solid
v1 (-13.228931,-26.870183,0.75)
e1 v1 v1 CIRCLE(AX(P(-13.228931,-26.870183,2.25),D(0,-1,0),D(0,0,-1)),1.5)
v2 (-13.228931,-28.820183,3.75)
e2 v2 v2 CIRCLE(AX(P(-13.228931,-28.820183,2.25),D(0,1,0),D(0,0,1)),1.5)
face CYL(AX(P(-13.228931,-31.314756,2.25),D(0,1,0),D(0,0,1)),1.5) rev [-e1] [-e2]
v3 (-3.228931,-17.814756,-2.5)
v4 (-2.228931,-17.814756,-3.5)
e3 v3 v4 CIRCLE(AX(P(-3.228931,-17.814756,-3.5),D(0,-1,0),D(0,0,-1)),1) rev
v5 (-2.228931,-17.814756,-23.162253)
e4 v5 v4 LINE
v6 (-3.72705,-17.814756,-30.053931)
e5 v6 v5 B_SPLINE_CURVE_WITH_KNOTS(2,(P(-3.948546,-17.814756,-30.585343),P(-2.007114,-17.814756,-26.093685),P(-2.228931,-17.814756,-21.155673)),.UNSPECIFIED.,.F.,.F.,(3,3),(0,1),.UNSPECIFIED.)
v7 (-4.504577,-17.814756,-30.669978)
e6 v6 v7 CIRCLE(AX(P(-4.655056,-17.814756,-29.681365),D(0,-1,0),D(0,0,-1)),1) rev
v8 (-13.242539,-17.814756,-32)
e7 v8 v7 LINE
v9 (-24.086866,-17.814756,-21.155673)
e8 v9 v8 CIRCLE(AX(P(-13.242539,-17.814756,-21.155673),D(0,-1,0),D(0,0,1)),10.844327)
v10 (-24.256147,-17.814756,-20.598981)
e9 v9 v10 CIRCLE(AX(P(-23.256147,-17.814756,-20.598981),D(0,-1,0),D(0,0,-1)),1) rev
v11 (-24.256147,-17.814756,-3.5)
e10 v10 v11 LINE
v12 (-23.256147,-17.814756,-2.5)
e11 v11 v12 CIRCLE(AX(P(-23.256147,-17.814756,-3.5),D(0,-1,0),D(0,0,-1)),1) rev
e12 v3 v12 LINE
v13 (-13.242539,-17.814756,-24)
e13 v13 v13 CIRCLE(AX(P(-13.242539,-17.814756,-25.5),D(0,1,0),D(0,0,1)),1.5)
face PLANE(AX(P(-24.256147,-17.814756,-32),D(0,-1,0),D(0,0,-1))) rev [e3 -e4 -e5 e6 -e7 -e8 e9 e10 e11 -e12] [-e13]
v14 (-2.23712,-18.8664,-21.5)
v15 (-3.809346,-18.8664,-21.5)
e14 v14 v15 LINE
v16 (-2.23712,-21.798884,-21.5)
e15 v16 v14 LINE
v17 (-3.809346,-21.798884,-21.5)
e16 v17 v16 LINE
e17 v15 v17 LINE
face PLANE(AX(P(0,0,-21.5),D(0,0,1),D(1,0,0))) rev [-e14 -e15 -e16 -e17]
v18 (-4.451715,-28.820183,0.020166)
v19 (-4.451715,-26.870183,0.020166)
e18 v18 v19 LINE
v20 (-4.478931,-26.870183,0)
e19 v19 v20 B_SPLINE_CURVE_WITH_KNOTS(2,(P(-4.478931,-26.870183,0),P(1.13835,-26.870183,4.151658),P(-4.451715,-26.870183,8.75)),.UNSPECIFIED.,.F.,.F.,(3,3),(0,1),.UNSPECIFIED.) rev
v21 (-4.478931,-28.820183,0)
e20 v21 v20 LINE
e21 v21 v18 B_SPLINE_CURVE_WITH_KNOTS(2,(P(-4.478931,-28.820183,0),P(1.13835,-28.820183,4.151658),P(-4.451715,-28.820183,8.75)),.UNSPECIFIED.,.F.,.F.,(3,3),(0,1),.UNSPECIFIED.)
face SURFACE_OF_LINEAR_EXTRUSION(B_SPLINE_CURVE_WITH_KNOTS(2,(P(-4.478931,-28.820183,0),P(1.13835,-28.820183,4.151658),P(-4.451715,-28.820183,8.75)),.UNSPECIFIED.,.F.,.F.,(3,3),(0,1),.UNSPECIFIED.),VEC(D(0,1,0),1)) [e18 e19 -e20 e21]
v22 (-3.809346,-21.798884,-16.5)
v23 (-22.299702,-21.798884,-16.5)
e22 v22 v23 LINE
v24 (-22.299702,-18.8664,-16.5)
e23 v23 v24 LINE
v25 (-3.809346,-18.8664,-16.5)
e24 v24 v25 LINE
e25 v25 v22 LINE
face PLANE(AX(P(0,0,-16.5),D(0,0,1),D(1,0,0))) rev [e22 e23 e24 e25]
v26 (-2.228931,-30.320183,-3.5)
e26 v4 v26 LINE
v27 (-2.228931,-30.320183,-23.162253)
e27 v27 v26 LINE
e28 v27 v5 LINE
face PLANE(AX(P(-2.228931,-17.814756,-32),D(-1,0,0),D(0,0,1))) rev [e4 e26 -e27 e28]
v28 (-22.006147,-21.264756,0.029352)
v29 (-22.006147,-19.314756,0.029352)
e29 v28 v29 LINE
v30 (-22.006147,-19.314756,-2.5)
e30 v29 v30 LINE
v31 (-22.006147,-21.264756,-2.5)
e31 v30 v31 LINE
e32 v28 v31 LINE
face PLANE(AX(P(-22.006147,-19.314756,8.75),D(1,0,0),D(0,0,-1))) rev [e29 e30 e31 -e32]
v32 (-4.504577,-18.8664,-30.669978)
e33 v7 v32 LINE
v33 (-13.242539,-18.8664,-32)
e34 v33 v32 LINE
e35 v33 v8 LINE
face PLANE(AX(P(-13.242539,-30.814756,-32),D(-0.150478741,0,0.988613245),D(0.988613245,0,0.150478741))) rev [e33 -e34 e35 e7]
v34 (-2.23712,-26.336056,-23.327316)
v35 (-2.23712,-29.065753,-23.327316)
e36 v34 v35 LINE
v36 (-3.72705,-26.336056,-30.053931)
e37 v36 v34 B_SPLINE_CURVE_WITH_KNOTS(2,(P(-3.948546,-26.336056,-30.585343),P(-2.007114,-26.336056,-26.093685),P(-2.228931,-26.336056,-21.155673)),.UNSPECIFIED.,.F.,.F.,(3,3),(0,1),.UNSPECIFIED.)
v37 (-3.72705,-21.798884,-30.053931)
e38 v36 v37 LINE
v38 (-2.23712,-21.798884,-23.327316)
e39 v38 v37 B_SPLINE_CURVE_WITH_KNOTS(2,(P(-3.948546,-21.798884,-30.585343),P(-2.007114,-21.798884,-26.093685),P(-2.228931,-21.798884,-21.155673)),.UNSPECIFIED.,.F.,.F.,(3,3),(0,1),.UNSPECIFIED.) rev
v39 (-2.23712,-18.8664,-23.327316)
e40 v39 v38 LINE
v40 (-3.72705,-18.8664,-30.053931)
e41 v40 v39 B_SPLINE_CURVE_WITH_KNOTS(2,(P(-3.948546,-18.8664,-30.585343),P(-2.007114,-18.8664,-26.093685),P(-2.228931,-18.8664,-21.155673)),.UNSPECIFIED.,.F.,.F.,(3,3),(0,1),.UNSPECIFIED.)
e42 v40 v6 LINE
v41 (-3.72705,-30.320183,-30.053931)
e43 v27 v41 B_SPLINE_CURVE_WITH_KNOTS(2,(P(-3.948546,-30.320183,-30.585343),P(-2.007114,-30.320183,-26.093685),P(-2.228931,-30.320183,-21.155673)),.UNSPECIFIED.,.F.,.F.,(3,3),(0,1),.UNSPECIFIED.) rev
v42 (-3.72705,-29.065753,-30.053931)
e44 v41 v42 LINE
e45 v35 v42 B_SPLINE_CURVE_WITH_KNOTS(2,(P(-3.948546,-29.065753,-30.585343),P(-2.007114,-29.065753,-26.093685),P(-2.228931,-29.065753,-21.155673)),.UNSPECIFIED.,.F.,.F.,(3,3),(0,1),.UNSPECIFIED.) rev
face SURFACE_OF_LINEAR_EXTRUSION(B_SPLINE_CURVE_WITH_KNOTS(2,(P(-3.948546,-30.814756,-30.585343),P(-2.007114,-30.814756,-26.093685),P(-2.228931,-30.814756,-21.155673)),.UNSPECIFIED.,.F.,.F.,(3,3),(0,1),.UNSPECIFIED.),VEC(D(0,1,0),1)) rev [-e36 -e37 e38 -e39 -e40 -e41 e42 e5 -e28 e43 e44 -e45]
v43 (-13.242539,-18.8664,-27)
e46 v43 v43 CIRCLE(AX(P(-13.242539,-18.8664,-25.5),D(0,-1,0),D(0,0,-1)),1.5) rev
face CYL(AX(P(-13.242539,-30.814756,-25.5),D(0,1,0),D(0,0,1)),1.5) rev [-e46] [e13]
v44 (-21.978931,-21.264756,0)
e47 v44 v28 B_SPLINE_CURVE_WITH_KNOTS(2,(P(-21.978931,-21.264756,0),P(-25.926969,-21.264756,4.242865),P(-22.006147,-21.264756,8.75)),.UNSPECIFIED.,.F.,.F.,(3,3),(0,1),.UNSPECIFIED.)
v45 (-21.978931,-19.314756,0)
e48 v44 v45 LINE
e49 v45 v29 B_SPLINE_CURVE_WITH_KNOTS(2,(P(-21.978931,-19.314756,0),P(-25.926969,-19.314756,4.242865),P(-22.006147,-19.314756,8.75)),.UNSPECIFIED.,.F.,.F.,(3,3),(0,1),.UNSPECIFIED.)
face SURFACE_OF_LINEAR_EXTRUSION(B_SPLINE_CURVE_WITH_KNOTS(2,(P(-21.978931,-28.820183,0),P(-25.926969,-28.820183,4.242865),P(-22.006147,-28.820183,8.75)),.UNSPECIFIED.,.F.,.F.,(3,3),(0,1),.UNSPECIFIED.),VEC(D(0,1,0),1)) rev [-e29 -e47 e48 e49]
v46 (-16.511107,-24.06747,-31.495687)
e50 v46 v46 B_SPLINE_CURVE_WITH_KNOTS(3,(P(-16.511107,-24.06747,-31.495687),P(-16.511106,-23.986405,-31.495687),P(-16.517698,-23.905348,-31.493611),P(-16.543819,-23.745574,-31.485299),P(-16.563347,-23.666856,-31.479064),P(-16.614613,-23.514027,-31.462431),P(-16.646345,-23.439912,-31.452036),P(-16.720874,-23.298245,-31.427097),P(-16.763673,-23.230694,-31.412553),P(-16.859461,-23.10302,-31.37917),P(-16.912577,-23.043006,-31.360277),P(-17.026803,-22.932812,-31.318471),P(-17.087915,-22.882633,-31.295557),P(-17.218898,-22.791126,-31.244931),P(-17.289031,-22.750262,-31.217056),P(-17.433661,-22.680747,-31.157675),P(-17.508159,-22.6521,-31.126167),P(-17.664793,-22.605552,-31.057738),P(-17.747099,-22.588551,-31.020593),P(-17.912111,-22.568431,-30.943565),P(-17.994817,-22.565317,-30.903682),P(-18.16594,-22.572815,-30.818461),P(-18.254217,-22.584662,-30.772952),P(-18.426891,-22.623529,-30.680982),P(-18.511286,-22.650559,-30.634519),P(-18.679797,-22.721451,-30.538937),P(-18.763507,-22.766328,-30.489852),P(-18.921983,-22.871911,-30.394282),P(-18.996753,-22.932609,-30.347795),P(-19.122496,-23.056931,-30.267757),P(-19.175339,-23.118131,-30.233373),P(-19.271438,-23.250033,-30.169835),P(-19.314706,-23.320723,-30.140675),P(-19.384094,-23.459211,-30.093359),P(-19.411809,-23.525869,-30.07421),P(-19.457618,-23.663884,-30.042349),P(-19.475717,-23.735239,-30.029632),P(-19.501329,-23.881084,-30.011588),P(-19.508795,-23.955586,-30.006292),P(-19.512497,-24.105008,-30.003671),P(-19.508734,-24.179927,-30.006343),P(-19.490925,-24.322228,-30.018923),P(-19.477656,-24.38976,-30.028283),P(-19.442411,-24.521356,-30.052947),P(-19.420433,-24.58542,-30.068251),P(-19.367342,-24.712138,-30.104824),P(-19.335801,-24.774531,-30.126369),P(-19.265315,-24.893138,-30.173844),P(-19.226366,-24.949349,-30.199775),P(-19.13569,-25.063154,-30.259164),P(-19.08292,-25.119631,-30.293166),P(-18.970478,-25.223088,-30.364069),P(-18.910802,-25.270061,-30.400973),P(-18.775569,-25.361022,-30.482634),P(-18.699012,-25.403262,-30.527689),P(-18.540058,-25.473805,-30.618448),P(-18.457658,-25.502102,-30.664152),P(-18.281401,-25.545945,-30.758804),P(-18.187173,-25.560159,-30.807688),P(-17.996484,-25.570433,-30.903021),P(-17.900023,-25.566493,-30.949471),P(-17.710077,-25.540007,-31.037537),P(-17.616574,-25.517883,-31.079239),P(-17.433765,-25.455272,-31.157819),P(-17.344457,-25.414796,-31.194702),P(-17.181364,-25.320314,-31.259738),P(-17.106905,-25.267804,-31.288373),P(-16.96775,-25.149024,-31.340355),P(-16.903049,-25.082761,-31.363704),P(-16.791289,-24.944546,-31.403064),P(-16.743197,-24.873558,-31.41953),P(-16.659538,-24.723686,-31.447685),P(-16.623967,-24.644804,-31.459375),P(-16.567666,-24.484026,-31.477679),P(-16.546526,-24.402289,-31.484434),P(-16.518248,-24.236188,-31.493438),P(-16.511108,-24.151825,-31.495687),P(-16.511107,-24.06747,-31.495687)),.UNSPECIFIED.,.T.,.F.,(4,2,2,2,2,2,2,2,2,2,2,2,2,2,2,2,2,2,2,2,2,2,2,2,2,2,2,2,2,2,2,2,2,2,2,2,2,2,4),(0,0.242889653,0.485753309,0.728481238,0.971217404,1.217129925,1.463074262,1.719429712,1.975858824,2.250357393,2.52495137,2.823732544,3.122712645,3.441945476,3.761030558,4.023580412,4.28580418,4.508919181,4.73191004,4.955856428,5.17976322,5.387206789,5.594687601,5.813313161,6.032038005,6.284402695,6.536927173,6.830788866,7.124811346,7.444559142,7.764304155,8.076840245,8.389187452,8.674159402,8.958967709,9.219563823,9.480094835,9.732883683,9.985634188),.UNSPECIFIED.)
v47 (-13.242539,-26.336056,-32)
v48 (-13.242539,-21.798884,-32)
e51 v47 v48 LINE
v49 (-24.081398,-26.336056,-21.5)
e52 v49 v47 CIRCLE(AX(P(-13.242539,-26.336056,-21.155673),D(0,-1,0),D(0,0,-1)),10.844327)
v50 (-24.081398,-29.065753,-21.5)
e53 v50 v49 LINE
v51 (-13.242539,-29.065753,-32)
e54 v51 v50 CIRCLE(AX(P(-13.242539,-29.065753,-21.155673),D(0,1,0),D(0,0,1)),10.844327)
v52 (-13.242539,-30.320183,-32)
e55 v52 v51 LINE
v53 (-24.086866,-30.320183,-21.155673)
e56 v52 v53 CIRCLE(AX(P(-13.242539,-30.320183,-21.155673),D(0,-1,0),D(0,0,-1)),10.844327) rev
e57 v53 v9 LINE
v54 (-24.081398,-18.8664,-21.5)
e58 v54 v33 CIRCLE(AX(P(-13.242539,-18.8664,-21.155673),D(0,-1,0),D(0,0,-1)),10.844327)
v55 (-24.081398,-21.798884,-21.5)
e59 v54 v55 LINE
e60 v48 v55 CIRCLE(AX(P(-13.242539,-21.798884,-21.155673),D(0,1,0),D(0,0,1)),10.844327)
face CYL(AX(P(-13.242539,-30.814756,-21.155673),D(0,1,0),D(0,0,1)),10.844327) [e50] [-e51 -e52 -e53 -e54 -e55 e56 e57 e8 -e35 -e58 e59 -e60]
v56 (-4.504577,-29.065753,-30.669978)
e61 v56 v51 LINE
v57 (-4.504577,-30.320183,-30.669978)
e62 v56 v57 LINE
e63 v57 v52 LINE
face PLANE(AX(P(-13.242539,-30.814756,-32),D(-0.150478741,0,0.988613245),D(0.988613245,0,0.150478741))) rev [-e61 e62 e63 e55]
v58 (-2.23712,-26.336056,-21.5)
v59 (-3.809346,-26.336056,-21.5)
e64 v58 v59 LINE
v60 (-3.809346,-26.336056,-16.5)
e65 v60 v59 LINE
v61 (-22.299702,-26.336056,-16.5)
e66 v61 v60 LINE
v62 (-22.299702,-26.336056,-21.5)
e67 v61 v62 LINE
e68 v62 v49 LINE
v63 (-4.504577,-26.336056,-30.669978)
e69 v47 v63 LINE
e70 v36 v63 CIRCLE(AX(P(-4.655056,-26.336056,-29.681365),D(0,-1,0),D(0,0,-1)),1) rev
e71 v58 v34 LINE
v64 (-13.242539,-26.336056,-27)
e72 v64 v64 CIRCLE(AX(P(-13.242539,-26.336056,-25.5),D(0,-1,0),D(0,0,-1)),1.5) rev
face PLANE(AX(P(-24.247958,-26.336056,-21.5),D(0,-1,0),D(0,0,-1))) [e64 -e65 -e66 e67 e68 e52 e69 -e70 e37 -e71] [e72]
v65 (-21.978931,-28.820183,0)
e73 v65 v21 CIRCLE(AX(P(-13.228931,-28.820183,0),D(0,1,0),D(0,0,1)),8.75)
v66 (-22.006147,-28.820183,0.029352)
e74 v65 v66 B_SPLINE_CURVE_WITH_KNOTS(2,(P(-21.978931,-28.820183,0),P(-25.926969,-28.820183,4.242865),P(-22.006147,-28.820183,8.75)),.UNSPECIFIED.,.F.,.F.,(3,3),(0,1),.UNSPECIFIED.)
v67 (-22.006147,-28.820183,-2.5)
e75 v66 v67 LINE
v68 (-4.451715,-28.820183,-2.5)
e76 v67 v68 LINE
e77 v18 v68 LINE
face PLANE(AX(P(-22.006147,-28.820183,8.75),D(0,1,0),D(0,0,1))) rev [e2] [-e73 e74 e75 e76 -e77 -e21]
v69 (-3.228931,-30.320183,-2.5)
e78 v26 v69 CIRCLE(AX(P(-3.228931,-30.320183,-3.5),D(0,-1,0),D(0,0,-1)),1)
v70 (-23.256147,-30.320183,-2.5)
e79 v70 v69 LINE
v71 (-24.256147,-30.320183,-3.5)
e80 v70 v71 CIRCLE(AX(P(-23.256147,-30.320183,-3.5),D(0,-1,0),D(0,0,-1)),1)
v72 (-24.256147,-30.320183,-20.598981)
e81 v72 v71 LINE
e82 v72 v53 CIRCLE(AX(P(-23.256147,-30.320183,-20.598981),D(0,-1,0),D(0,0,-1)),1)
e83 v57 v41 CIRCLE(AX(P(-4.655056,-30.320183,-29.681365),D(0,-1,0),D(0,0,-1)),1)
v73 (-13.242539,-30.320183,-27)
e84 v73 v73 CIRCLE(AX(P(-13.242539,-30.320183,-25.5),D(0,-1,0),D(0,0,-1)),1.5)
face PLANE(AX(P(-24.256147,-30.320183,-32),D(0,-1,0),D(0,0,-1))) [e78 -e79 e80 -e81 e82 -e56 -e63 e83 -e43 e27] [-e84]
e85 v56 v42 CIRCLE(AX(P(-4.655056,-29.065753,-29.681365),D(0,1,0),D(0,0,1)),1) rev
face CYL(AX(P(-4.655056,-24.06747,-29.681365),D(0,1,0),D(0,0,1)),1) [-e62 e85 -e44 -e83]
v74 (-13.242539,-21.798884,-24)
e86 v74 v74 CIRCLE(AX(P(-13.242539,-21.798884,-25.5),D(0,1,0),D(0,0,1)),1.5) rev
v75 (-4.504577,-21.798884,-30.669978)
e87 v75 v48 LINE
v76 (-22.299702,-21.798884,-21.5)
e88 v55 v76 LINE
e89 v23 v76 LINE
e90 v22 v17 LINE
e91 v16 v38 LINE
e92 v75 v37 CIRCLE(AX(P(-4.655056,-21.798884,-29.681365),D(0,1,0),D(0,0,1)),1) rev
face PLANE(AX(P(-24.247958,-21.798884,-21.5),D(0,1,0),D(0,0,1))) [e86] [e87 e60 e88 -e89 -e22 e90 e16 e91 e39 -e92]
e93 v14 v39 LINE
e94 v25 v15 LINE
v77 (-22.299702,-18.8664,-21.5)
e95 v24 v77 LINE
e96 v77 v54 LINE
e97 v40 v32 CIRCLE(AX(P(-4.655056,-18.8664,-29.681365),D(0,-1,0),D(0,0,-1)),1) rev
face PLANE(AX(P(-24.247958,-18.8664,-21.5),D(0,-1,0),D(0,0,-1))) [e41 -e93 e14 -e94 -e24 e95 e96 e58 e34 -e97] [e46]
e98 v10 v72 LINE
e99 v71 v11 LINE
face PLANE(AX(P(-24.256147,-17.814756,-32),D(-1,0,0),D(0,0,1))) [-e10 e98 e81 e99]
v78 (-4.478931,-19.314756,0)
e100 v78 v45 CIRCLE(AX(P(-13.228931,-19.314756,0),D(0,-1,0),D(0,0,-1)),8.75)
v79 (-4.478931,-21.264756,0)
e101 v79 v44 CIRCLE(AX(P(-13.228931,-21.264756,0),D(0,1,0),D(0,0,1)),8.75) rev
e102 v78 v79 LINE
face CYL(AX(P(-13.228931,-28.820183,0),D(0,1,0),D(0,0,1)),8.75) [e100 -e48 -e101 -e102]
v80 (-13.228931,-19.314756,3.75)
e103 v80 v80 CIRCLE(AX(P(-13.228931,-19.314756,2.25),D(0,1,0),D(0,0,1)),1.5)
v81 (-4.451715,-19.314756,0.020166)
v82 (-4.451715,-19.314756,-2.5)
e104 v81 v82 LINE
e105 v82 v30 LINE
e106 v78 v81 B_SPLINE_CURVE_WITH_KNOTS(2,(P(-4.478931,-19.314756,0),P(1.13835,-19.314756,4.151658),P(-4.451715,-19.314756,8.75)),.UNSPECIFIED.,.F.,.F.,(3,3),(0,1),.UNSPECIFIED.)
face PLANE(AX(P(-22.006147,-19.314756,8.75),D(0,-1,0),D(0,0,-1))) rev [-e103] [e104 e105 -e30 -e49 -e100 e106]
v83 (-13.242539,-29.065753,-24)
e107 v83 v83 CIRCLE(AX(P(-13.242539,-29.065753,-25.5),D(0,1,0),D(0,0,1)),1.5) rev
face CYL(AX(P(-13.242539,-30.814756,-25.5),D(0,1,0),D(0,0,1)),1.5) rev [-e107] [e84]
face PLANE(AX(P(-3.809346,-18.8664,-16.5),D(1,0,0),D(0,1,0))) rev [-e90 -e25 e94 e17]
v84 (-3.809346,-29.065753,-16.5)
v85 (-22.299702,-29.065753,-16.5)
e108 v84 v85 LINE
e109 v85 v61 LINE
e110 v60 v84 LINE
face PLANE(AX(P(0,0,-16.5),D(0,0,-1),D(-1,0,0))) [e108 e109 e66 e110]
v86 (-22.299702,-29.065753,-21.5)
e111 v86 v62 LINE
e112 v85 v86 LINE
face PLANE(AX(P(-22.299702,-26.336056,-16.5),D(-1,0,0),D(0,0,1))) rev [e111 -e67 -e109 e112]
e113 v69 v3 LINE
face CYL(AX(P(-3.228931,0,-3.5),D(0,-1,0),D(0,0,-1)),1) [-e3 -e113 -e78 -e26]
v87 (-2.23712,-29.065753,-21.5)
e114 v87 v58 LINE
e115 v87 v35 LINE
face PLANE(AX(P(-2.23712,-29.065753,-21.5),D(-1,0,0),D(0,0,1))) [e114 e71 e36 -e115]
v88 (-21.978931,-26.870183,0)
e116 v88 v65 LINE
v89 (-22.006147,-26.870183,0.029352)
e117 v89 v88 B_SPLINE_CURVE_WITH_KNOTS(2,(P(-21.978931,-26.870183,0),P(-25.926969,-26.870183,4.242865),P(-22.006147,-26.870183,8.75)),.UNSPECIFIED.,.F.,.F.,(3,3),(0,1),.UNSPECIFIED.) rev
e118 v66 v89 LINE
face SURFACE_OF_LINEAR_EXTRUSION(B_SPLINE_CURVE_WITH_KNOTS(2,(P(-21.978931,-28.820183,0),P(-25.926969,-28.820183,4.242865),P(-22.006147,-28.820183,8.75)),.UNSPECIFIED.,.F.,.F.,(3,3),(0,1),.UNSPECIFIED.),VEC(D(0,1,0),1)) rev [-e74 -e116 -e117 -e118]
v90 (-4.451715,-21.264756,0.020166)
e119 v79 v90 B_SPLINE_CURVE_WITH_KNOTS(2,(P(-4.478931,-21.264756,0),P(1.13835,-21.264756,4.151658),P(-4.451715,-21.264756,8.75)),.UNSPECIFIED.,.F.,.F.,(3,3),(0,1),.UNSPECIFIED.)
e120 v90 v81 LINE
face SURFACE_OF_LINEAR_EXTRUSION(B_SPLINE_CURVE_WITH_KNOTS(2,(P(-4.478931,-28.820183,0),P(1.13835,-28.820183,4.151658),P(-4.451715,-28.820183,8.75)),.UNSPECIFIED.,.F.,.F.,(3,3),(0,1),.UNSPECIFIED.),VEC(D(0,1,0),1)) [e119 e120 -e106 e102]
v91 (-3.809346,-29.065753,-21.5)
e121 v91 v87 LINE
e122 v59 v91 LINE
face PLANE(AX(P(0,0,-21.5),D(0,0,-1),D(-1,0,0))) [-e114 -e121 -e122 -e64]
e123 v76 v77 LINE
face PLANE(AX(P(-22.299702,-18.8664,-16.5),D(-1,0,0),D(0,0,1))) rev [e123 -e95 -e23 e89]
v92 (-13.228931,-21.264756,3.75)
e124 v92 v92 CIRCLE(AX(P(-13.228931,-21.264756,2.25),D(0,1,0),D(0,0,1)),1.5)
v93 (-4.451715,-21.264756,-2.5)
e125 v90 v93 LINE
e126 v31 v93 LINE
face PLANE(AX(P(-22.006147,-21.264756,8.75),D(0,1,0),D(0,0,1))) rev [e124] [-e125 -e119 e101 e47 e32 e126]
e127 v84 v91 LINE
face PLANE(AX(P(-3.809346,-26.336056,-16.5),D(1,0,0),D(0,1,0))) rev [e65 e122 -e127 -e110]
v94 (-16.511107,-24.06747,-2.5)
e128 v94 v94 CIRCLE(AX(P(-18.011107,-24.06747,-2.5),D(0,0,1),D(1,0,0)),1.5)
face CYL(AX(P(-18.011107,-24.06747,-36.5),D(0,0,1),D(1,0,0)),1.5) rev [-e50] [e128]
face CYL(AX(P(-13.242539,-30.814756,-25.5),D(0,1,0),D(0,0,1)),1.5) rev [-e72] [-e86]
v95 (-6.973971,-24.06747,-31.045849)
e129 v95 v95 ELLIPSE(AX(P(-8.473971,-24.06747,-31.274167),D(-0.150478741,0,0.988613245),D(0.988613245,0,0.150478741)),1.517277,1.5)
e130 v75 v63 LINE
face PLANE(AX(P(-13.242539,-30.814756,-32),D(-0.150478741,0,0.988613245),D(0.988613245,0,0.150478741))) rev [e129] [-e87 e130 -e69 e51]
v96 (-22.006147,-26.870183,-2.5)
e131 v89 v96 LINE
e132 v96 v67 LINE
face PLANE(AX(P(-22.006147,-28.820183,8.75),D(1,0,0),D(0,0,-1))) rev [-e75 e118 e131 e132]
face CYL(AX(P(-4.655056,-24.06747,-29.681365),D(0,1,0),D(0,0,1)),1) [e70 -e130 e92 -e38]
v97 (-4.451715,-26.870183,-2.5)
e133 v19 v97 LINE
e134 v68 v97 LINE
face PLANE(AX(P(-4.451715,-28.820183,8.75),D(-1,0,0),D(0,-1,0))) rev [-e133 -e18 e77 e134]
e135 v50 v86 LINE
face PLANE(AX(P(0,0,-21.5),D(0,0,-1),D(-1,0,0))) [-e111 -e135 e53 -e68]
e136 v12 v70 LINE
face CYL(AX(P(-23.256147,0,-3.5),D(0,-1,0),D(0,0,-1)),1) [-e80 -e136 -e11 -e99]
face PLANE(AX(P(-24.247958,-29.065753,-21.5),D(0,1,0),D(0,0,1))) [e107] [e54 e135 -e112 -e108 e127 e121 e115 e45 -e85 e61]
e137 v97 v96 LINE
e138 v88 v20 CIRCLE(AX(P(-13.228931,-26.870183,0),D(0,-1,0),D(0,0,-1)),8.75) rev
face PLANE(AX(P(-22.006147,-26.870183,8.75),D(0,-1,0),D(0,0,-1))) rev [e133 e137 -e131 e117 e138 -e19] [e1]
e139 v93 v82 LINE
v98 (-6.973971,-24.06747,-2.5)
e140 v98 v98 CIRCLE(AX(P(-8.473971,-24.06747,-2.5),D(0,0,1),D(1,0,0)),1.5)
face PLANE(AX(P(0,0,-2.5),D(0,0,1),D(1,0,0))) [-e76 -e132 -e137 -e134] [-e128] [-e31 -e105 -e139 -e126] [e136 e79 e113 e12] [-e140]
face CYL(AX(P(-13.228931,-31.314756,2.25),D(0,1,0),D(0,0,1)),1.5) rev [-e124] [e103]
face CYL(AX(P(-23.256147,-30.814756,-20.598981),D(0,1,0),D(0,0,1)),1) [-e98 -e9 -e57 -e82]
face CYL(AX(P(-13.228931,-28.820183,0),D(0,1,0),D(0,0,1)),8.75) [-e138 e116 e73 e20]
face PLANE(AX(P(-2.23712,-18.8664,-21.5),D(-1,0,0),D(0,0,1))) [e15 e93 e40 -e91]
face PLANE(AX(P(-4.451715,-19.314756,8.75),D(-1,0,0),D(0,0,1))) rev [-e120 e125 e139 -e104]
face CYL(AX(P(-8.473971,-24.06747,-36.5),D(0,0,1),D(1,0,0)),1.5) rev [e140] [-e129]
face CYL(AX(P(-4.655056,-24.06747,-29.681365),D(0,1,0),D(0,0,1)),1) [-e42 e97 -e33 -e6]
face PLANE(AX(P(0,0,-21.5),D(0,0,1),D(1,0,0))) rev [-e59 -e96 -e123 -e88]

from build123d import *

# Parameters (mm, degrees)
SKETCH2_W             = 17.554431489
SKETCH2_H             = 1.95
BOSS_EXTRUDE1_DEPTH   = 8.75
BOSS_EXTRUDE1_2_DEPTH = 8.75
CUT_EXTRUDE1_DEPTH    = 26.518349076
SKETCH4_W             = 22.027215745
SKETCH4_H             = 12.505427167
BOSS_EXTRUDE2_DEPTH   = 32
SKETCH5_R             = 1.5
CUT_EXTRUDE2_DEPTH    = 12
SKETCH6_W             = 22.027215745
SKETCH6_H             = 12.505427167
SKETCH6_W_2           = 17.554431489
SKETCH6_H_2           = 1.95
CUT_EXTRUDE3_DEPTH    = 2.5
SKETCH7_R             = 1.5
CUT_EXTRUDE4_DEPTH    = 13
SKETCH8_R             = 1.5
CUT_EXTRUDE5_DEPTH    = 34
FILLET3_R             = 1
SKETCH9_W             = 22.010837792
SKETCH9_H             = 2.932484208
SKETCH9_H_2           = 2.729697333
CUT_EXTRUDE6_DEPTH    = 11
SKETCH10_W            = 18.490355351
SKETCH10_H            = 2.932484208
SKETCH10_H_2          = 2.729697333
CUT_EXTRUDE7_DEPTH    = 5


with BuildPart() as part:
    # Sketch2 → Boss-Extrude1 (new body)
    with BuildSketch(Plane.XY):
        with Locations((-13.228930986, -27.845183414)):
            Rectangle(SKETCH2_W, SKETCH2_H)
    extrude(amount=BOSS_EXTRUDE1_DEPTH)


with BuildPart() as body_2:
    # Sketch2 → Boss-Extrude1 2 (new body)
    with BuildSketch(Plane.XY):
        with Locations((-13.228930986, -20.289756247)):
            Rectangle(SKETCH2_W, SKETCH2_H)
    extrude(amount=BOSS_EXTRUDE1_2_DEPTH)


with BuildPart() as cut_extrude1_tool:
    # Sketch3 → Cut-Extrude1 (new, through all)
    with BuildSketch(Plane(origin=(0, -19.314756247, 0), x_dir=(1, 0, 0), z_dir=(0, 1, 0))):
        with BuildLine():
            ThreePointArc((-13.228930986, -8.75), (-7.041746651, -6.187184335), (-4.478930986, 0))
            add(Edge.make_bspline(
                [(-4.478930986, 0), (1.138349918, -4.151657709), (-4.451715242, -8.75)],
                knots=[0, 0, 0, 1, 1, 1], degree=2))
            add(Edge.make_bspline(
                [(-22.006146731, -8.75), (-13.228930986, -12.473510392), (-4.451715242, -8.75)],
                knots=[0, 0, 0, 1, 1, 1], degree=2))
            add(Edge.make_bspline(
                [(-21.978930986, 0), (-25.926969228, -4.242865138), (-22.006146731, -8.75)],
                knots=[0, 0, 0, 1, 1, 1], degree=2))
            ThreePointArc((-21.978930986, 0), (-19.416115322, -6.187184335), (-13.228930986, -8.75))
        make_face()
    extrude(amount=-CUT_EXTRUDE1_DEPTH)


with BuildPart() as part_1:
    add(part.part)

    # Cut-Extrude1: cut by cut_extrude1_tool
    add(cut_extrude1_tool.part, mode=Mode.SUBTRACT)



with BuildPart() as body_2_1:
    add(body_2.part)

    # Cut-Extrude1: cut by cut_extrude1_tool
    add(cut_extrude1_tool.part, mode=Mode.SUBTRACT)


with BuildPart() as part_2:
    add(part_1.part)

    add(body_2_1.part)  # Boss-Extrude2 merges body 2
    # Sketch4 → Boss-Extrude2 (add)
    with BuildSketch(Plane(origin=(0, 0, 0), x_dir=(-1, 0, 0), z_dir=(0, 0, -1))):
        with Locations((13.242538859, -24.067469831)):
            Rectangle(SKETCH4_W, SKETCH4_H)
    extrude(amount=BOSS_EXTRUDE2_DEPTH)

    # Sketch5 → Cut-Extrude2 (cut)
    with BuildSketch(Plane(origin=(0, -19.314756247, 0), x_dir=(1, 0, 0), z_dir=(0, 1, 0))):
        with Locations(Location((-13.228930986, -2.25, 0), (0, 0, 270))):
            Circle(SKETCH5_R)
    extrude(amount=-CUT_EXTRUDE2_DEPTH, mode=Mode.SUBTRACT)

    # Sketch6 → Cut-Extrude3 (cut)
    with BuildSketch(Plane.XY):
        with Locations((-13.242538859, -24.067469831)):
            Rectangle(SKETCH6_W, SKETCH6_H)
        with Locations((-13.228930986, -27.845183414)):
            Rectangle(SKETCH6_W_2, SKETCH6_H_2, mode=Mode.SUBTRACT)
        with Locations((-13.228930986, -20.289756247)):
            Rectangle(SKETCH6_W_2, SKETCH6_H_2, mode=Mode.SUBTRACT)
    extrude(amount=-CUT_EXTRUDE3_DEPTH, mode=Mode.SUBTRACT)

    # Sketch7 → Cut-Extrude4 (cut)
    with BuildSketch(Plane(origin=(0, -17.814756247, 0), x_dir=(1, 0, 0), z_dir=(0, 1, 0))):
        with Locations(Location((-13.242538859, 25.5, 0), (0, 0, 270))):
            Circle(SKETCH7_R)
        with BuildLine():
            Line((-24.086865874, 21.155672985), (-24.256146731, 21.155672985))
            add(Edge.make_bspline(
                [(-2.228930986, 21.155672985), (11.471530889, 27.189710441), (-11.765166974, 53.431279988), (-37.007876173, 21.523583672), (-24.256146731, 21.155672985)],
                knots=[0, 0, 0, 0, 0.52011282, 1, 1, 1, 1], degree=3))
            add(Edge.make_bspline(
                [(-3.948545621, 30.585343246), (-2.007113924, 26.093685314), (-2.228930986, 21.155672985)],
                knots=[0, 0, 0, 1, 1, 1], degree=2))
            Line((-3.948545621, 30.585343246), (-13.242538859, 32))
            ThreePointArc((-13.242538859, 32), (-20.910636028, 28.823770155), (-24.086865874, 21.155672985))
        make_face()
    extrude(amount=-CUT_EXTRUDE4_DEPTH, mode=Mode.SUBTRACT)

    # Sketch8 → Cut-Extrude5 (cut)
    with BuildSketch(Plane.XY.offset(-2.5)):
        with Locations((-18.011106811, -24.06746983)):
            Circle(SKETCH8_R)
        with Locations((-8.473970906, -24.06746983)):
            Circle(SKETCH8_R)
    extrude(amount=-CUT_EXTRUDE5_DEPTH, mode=Mode.SUBTRACT)

    # Fillet3
    # the kernel refuses this fillet: 1 mm, written as the material it takes off along each edge
    with BuildSketch(Plane(origin=(-24.256146731, -15.314756247, -2.5), x_dir=(1, 0, 0), z_dir=(0, -1, 0))) as fillet3_piece_1:
        with BuildLine():
            CenterArc((FILLET3_R, -FILLET3_R), FILLET3_R, 90, 90)
            Line((0, -FILLET3_R), (-FILLET3_R * 0.02, -FILLET3_R))
            Line((-FILLET3_R * 0.02, -FILLET3_R), (-FILLET3_R * 0.02, FILLET3_R * 0.02))
            Line((-FILLET3_R * 0.02, FILLET3_R * 0.02), (FILLET3_R, FILLET3_R * 0.02))
            Line((FILLET3_R, FILLET3_R * 0.02), (FILLET3_R, 0))
        make_face()
    extrude(amount=17.505427167, mode=Mode.SUBTRACT)
    with BuildSketch(Plane(origin=(-24.256146731, -16.423026869, -21.155672985), x_dir=(0, 0, 1), z_dir=(0, -1, 0))) as fillet3_piece_2:
        with BuildLine():
            CenterArc((0.556691751, -1), FILLET3_R, 90, 33.827317624)
            Line((0, -0.169280857), (-0.011133835, -0.152666474))
            ThreePointArc((-0.011133835, -0.152666474), (-0.02, -0.084640429), (-0.02, 0))
            Line((-0.02, 0), (0, 0.02))
            Line((0, 0.02), (0.556691751, 0.02))
            Line((0.556691751, 0.02), (0.556691751, 0))
        make_face()
    extrude(amount=15.288885922, mode=Mode.SUBTRACT)
    with BuildSketch(Plane(origin=(-2.228930986, -32.820183414, -2.5), x_dir=(0, 0, -1), z_dir=(0, 1, 0))) as fillet3_piece_3:
        with BuildLine():
            CenterArc((FILLET3_R, FILLET3_R), FILLET3_R, 180, 90)
            Line((0, FILLET3_R), (-FILLET3_R * 0.02, FILLET3_R))
            Line((-FILLET3_R * 0.02, FILLET3_R), (-FILLET3_R * 0.02, -FILLET3_R * 0.02))
            Line((-FILLET3_R * 0.02, -FILLET3_R * 0.02), (FILLET3_R, -FILLET3_R * 0.02))
            Line((FILLET3_R, -FILLET3_R * 0.02), (FILLET3_R, 0))
        make_face()
    extrude(amount=17.505427167, mode=Mode.SUBTRACT)
    with BuildSketch(Plane(origin=(-3.948545621, -16.375444783, -30.585343246), x_dir=(-0.9886132451058307, 0, -0.1504787413600958), z_dir=(0, -1, 0))) as fillet3_piece_4:
        with BuildLine():
            CenterArc((0.562435527, -1), FILLET3_R, 90, 59.471323616)
            Line((-0.298939504, -0.492030458), (-0.316167005, -0.481871067))
            ThreePointArc((-0.316167005, -0.481871067), (-0.168173949, -0.234650824), (-0.016955383, 0.010607308))
            Line((-0.016955383, 0.010607308), (0, 0.02))
            Line((0, 0.02), (0.562435527, 0.02))
            Line((0.562435527, 0.02), (0.562435527, 0))
        make_face()
    extrude(amount=15.384050094, mode=Mode.SUBTRACT)

    # Sketch9 → Cut-Extrude6 (cut)
    with BuildSketch(Plane.XY.offset(-32.5)):
        with Locations((-13.24253886, -20.332641731)):
            Rectangle(SKETCH9_W, SKETCH9_H)
        with Locations((-13.24253886, -27.700904501)):
            Rectangle(SKETCH9_W, SKETCH9_H_2)
    extrude(amount=CUT_EXTRUDE6_DEPTH, mode=Mode.SUBTRACT)

    # Sketch10 → Cut-Extrude7 (cut)
    with BuildSketch(Plane(origin=(0, 0, -21.5), x_dir=(-1, 0, 0), z_dir=(0, 0, -1))):
        with Locations((13.054523996, -20.332641731)):
            Rectangle(SKETCH10_W, SKETCH10_H)
        with Locations((13.054523996, -27.700904501)):
            Rectangle(SKETCH10_W, SKETCH10_H_2)
    extrude(amount=-CUT_EXTRUDE7_DEPTH, mode=Mode.SUBTRACT)


solid = part_2.part
